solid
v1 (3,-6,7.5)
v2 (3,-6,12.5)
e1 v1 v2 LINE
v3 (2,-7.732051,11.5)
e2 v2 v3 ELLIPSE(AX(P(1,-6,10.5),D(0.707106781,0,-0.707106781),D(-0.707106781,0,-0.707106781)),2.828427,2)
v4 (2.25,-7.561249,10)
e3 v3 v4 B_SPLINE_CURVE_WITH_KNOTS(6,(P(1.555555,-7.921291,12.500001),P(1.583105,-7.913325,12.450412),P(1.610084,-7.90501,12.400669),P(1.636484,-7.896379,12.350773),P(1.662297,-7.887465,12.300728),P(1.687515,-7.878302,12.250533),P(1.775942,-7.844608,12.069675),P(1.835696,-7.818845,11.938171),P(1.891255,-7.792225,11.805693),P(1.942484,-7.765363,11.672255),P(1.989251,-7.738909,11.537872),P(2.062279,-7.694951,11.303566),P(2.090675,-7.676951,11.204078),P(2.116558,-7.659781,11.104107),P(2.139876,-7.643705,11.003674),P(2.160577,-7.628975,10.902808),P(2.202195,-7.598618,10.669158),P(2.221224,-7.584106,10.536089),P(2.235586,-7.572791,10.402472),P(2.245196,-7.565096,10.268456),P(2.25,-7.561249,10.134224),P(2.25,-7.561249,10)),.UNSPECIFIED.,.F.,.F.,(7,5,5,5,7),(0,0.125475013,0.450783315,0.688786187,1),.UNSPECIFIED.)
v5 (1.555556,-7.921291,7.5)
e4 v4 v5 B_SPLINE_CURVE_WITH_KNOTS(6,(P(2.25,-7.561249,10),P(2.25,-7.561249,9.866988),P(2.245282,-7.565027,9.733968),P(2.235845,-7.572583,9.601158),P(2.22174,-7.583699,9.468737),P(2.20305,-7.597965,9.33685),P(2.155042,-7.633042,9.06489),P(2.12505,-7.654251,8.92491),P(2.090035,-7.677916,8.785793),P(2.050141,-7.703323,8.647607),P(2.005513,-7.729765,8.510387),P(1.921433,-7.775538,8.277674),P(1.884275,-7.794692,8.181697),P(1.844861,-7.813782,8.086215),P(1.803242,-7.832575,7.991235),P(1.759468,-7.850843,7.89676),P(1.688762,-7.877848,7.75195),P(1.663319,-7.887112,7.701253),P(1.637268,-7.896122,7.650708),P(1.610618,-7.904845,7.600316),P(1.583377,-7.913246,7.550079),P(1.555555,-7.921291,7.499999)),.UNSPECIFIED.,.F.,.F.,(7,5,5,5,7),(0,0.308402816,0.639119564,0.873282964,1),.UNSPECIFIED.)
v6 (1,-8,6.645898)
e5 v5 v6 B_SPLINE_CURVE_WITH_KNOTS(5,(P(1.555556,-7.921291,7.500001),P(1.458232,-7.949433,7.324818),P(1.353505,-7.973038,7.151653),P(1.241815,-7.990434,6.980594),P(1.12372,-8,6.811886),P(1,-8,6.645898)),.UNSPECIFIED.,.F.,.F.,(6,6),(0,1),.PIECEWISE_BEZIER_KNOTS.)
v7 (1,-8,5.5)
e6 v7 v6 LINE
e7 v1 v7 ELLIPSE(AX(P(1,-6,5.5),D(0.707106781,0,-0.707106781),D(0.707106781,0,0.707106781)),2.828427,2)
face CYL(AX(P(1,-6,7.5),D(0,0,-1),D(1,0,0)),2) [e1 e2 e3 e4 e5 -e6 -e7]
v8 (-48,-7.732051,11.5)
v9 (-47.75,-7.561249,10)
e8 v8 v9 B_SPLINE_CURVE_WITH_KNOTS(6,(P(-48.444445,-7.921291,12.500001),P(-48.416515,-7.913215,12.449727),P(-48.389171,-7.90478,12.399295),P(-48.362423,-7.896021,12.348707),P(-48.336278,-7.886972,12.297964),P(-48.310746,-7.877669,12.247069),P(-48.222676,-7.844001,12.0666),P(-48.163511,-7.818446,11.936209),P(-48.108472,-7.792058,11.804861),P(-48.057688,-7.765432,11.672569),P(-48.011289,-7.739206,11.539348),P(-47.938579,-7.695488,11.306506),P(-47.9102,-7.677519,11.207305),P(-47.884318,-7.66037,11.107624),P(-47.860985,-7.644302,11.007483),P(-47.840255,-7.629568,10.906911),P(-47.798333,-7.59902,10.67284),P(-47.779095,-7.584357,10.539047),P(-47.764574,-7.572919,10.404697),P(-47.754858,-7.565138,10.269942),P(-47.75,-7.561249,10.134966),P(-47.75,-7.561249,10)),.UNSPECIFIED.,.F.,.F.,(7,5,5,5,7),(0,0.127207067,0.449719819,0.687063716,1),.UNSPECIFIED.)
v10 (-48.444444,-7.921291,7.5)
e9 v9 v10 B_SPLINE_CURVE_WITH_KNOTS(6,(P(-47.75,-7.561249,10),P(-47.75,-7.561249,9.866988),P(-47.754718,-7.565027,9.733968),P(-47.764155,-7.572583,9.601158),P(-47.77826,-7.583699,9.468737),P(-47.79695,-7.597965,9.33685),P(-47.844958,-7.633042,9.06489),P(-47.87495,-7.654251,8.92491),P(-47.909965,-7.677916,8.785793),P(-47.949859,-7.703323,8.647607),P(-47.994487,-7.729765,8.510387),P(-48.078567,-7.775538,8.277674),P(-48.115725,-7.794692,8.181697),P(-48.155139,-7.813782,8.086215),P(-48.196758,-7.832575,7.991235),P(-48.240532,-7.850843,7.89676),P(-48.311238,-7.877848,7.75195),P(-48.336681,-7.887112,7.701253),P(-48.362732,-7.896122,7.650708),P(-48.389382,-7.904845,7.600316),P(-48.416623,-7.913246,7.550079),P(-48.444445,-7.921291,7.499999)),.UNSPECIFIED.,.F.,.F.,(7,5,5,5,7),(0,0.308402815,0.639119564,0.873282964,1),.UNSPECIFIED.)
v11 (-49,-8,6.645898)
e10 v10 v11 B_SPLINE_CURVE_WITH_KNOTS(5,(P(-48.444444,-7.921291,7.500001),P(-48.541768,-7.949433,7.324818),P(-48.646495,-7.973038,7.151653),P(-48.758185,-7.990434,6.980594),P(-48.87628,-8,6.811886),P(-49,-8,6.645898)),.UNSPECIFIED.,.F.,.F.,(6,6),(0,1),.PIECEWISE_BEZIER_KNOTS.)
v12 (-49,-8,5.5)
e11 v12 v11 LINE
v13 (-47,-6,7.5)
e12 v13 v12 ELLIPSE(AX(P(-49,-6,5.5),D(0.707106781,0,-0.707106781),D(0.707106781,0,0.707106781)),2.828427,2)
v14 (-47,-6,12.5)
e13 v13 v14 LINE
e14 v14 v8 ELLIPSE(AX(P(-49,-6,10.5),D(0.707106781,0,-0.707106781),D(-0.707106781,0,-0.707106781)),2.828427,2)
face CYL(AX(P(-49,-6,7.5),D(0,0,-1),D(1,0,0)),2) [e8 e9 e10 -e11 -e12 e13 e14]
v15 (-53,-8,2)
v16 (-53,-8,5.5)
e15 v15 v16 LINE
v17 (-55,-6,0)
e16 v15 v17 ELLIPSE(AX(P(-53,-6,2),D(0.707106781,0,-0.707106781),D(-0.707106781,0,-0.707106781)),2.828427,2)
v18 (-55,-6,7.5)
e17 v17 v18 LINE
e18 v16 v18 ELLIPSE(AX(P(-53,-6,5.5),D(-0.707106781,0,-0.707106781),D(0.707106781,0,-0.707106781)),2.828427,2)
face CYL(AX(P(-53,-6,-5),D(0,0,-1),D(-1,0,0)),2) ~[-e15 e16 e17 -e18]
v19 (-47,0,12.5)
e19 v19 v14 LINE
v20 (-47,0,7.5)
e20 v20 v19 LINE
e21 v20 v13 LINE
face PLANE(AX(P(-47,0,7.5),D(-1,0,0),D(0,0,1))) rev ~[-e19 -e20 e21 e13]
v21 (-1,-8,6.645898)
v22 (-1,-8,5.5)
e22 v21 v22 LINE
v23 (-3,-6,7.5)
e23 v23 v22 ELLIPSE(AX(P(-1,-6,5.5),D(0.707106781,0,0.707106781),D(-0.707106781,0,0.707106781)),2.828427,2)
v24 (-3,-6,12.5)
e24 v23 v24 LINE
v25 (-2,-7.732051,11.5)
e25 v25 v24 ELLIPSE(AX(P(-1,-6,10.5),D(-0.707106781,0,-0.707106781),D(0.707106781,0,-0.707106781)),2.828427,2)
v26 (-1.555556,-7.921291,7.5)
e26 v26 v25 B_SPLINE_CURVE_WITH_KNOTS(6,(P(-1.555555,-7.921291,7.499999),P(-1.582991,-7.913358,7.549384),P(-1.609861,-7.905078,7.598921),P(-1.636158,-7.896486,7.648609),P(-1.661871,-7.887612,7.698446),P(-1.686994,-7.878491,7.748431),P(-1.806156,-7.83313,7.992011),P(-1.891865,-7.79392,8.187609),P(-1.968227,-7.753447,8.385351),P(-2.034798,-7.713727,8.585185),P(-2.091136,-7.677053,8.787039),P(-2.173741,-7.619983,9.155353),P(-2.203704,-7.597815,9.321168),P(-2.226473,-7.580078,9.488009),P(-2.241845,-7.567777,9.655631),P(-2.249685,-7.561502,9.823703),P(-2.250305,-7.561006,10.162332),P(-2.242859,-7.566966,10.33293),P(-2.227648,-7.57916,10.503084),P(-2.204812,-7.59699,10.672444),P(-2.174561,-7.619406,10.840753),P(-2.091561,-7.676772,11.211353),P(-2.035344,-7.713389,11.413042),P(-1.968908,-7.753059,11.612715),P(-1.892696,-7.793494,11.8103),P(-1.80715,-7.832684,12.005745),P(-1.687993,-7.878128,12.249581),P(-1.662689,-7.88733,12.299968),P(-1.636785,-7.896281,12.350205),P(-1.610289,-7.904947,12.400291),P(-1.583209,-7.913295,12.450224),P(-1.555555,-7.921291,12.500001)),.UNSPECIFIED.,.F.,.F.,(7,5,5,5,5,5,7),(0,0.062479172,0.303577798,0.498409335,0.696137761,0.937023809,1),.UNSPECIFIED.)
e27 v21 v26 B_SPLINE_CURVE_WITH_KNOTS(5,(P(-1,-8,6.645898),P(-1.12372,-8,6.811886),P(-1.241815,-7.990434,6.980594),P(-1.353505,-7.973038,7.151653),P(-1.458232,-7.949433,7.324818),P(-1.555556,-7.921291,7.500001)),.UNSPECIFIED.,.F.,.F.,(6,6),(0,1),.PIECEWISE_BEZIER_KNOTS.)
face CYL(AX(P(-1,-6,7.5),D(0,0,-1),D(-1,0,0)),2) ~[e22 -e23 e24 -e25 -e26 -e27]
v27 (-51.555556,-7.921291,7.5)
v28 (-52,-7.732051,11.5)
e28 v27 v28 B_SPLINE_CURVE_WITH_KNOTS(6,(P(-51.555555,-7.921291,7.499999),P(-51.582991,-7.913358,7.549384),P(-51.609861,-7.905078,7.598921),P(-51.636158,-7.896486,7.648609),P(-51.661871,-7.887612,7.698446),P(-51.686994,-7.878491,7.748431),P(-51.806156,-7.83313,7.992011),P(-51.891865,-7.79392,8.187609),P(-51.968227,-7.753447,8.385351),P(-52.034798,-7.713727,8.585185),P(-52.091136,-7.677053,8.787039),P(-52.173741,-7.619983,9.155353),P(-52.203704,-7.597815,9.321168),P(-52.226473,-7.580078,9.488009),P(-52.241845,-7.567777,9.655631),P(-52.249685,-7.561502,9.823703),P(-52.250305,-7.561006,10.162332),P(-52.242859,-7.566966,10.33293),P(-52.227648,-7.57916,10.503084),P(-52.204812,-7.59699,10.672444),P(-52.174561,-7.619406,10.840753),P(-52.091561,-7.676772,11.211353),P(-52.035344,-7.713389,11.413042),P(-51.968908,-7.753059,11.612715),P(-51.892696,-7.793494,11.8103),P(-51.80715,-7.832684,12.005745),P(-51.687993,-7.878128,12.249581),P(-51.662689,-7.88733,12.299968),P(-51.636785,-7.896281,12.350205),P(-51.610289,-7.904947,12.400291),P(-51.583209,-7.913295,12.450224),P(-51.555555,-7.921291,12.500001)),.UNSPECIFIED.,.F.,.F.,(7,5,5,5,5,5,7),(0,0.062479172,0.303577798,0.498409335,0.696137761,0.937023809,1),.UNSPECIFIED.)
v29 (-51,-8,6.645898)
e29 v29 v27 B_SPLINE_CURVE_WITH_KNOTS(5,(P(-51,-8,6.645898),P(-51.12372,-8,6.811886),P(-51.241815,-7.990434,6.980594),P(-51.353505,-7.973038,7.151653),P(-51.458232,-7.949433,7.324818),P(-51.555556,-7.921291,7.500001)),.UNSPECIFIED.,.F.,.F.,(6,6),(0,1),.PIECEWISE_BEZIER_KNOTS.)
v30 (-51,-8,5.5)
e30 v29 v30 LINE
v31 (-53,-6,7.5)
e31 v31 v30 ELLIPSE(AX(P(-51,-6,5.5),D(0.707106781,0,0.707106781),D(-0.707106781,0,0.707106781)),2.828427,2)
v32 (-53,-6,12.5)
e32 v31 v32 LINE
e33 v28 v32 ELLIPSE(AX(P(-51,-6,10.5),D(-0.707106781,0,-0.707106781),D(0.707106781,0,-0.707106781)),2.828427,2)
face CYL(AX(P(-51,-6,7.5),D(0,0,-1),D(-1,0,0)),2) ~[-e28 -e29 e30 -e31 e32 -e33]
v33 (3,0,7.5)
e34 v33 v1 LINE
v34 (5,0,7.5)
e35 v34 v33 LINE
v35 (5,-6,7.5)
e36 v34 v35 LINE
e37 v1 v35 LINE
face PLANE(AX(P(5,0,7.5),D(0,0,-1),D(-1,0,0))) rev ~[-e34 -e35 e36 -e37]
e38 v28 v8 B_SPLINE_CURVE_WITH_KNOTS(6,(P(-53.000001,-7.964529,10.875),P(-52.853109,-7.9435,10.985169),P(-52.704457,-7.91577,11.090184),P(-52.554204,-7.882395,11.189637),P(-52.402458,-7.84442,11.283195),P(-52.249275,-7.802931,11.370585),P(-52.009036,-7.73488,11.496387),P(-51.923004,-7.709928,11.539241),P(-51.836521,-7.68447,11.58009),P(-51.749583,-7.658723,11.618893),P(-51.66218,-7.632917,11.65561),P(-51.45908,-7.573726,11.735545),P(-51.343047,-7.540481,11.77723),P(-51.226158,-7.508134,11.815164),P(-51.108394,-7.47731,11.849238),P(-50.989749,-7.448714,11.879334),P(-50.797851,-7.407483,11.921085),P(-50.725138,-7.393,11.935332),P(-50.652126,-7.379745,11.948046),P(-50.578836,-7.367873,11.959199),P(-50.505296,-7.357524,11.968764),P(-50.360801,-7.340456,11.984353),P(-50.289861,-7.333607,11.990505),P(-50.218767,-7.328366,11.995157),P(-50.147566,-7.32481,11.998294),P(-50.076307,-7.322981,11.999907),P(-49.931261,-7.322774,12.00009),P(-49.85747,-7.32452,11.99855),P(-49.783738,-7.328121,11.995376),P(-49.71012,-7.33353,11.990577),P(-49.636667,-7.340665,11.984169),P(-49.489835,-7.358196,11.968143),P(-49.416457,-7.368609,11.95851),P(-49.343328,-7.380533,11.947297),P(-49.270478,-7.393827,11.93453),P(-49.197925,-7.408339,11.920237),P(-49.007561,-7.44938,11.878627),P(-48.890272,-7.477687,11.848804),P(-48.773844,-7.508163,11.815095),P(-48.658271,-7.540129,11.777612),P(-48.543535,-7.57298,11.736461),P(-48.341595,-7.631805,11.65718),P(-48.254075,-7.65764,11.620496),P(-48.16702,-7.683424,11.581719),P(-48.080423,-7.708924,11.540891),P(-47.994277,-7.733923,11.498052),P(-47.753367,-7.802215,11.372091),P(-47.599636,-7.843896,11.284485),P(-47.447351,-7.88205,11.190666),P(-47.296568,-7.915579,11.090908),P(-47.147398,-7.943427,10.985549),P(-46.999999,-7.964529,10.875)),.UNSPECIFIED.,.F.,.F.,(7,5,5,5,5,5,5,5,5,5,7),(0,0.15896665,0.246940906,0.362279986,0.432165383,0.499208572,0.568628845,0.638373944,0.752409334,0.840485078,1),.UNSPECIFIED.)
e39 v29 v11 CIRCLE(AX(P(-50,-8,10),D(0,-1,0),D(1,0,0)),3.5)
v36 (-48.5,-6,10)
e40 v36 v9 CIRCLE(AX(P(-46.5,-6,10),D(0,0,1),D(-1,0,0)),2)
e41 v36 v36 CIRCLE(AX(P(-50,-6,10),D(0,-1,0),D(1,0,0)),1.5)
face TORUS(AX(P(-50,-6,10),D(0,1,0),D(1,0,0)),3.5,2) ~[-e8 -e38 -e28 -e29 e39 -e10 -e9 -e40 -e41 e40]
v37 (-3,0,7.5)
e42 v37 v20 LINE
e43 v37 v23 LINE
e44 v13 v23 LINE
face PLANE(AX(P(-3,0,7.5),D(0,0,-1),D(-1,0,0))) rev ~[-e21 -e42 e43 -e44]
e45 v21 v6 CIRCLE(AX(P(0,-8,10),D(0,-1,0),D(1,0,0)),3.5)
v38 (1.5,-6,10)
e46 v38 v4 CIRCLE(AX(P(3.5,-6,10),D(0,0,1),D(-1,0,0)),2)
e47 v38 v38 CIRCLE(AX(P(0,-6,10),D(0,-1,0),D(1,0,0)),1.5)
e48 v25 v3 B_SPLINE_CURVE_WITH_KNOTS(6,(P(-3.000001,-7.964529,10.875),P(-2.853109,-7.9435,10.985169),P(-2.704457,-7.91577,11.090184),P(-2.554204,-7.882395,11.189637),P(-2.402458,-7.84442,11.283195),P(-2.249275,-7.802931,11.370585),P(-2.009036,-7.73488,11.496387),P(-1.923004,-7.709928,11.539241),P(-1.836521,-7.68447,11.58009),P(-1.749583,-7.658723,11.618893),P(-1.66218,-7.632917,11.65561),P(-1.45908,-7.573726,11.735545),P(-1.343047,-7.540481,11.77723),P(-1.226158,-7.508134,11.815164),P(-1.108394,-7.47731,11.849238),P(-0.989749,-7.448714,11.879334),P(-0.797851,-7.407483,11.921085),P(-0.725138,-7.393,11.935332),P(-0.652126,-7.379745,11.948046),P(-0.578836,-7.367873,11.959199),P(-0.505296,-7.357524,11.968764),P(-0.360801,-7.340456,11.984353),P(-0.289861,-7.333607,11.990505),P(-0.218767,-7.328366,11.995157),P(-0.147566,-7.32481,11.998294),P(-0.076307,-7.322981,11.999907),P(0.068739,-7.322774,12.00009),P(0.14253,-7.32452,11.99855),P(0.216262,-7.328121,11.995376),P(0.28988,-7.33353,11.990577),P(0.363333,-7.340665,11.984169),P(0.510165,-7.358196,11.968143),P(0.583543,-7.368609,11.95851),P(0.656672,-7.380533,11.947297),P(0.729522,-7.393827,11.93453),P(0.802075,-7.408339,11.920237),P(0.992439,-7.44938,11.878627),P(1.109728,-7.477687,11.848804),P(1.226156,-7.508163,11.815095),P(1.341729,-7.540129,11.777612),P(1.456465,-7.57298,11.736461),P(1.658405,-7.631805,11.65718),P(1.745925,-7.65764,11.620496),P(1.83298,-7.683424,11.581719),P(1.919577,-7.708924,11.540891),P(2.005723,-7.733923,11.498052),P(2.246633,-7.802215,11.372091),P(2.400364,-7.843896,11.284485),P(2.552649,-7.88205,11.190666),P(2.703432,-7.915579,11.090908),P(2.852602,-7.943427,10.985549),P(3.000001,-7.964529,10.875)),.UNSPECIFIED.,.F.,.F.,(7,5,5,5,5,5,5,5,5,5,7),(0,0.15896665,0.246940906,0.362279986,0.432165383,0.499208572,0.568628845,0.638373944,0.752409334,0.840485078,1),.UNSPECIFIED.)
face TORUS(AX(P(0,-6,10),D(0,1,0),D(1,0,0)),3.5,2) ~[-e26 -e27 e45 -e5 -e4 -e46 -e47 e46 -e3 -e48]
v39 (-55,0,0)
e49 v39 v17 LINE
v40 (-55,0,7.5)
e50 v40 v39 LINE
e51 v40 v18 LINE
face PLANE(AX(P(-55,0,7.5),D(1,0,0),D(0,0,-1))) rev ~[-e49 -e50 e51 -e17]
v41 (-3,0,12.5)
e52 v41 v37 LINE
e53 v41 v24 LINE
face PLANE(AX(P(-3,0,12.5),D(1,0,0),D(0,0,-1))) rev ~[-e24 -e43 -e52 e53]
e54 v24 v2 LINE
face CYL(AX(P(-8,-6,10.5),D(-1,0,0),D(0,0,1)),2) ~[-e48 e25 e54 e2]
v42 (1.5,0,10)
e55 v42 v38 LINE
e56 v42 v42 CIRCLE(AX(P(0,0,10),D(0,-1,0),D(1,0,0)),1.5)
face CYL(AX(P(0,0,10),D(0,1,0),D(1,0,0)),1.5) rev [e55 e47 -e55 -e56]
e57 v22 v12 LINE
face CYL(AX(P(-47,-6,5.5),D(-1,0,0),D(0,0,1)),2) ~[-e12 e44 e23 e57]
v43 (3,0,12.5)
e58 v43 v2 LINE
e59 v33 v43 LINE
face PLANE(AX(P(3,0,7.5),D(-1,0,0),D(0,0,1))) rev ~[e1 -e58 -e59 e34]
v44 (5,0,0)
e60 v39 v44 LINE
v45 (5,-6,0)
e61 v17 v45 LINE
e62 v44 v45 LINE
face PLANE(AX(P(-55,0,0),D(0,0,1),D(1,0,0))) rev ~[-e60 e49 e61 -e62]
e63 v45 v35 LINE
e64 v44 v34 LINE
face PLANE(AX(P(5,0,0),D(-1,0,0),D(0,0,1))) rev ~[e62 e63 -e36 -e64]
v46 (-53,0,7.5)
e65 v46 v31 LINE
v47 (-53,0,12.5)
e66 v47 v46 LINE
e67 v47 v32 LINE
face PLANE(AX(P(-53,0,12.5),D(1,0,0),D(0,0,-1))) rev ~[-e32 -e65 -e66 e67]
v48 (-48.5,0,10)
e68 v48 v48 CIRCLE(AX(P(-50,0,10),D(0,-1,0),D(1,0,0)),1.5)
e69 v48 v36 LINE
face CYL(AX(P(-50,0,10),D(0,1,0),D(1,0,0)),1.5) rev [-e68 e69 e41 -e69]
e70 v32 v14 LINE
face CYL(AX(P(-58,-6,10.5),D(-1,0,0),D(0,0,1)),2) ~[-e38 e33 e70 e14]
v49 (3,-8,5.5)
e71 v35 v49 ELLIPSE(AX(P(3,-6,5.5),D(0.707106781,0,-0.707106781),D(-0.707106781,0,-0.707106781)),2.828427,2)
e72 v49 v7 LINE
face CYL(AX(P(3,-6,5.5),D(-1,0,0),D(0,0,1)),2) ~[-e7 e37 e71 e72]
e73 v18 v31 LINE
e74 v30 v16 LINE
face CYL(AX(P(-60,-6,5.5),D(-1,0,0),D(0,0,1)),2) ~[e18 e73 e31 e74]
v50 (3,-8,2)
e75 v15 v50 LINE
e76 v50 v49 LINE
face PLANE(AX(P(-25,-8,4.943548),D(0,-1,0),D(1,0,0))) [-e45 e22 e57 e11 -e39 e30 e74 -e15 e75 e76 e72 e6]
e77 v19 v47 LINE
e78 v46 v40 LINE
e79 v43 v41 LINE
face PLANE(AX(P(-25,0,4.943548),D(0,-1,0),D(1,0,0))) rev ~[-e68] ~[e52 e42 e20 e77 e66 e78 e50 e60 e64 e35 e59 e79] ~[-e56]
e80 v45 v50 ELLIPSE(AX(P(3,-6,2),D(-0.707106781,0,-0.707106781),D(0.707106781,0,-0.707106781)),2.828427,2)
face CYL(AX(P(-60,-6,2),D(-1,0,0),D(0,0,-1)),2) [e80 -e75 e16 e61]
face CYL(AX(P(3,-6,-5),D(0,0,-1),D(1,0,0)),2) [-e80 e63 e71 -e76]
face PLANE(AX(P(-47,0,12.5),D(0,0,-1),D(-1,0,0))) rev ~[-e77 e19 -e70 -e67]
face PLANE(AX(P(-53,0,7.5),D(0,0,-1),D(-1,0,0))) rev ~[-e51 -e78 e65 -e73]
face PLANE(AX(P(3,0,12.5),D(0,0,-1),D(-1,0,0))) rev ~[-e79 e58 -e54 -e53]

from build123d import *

# Parameters (mm, degrees)
F0_R         = 1.5
F1_DEPTH     = 8
F2_T1_DEPTH  = 17.5
F2_T3_DEPTH  = 70
F2_T5_DEPTH  = 7
F2_T7_DEPTH  = 10
F2_T9_DEPTH  = 16
F2_T11_DEPTH = 44
F2_T13_DEPTH = 16
F2_T15_DEPTH = 7
F2_T25_DEPTH = 12
F2_T29_DEPTH = 15
F2_T36_DEPTH = 15
F2_T40_DEPTH = 49
F2_T47_DEPTH = 49
F2_T51_DEPTH = 15
F2_T58_DEPTH = 15
F2_T62_DEPTH = 12


# Not quite as in the source:
# - a fillet or chamfer that OpenCascade refuses, or shapes differently, is made with other operations: its cross-section is extruded or revolved along the edge and cut away or added


with BuildPart() as f1:
    # F0 (on Front) → F1 (new body)
    with BuildSketch(Plane.XZ):
        Polygon((-55, 7.5), (-55, 0), (5, 0), (5, 7.5), (3, 7.5), (3, 12.5), (-3, 12.5), (-3, 7.5), (-47, 7.5), (-47, 12.5), (-53, 12.5), (-53, 7.5), align=None)
        with Locations((-50, 10)):
            Circle(F0_R, mode=Mode.SUBTRACT)
        with Locations((0, 10)):
            Circle(F0_R, mode=Mode.SUBTRACT)
    extrude(amount=F1_DEPTH)

    # F2: fillet of radius 2 on 14 edges, made by hand

    # F2_s2 → F2_t1 (cut)
    with BuildSketch(Plane.XY.offset(-5)):
        with BuildLine():
            ThreePointArc((-55, -6), (-54.4142135624, -7.4142135624), (-53, -8))
            Line((-53, -8), (-55, -8))
            Line((-55, -8), (-55, -6))
        make_face()
        with BuildLine():
            ThreePointArc((5, -6), (4.4142135624, -7.4142135624), (3, -8))
            Line((3, -8), (5, -8))
            Line((5, -8), (5, -6))
        make_face()
    extrude(amount=F2_T1_DEPTH, mode=Mode.SUBTRACT)

    # F2_s4 → F2_t3 (cut)
    with BuildSketch(Plane.YZ.offset(-60)):
        with BuildLine():
            ThreePointArc((-6, 0), (-7.4142135624, 0.5857864376), (-8, 2))
            Line((-8, 2), (-8, 0))
            Line((-8, 0), (-6, 0))
        make_face()
    extrude(amount=F2_T3_DEPTH, mode=Mode.SUBTRACT)

    # F2_s6 → F2_t5 (cut)
    with BuildSketch(Plane.YZ.offset(3)):
        with BuildLine():
            ThreePointArc((-6, 7.5), (-7.4142135624, 6.9142135624), (-8, 5.5))
            Line((-8, 5.5), (-8, 7.5))
            Line((-8, 7.5), (-6, 7.5))
        make_face()
    extrude(amount=F2_T5_DEPTH, mode=Mode.SUBTRACT)

    # F2_s8 → F2_t7 (cut)
    with BuildSketch(Plane.XY.offset(7.5)):
        with BuildLine():
            ThreePointArc((3, -6), (2.4142135624, -7.4142135624), (1, -8))
            Line((1, -8), (3, -8))
            Line((3, -8), (3, -6))
        make_face()
        with BuildLine():
            ThreePointArc((-3, -6), (-2.4142135624, -7.4142135624), (-1, -8))
            Line((-1, -8), (-3, -8))
            Line((-3, -8), (-3, -6))
        make_face()
        with BuildLine():
            ThreePointArc((-47, -6), (-47.5857864376, -7.4142135624), (-49, -8))
            Line((-49, -8), (-47, -8))
            Line((-47, -8), (-47, -6))
        make_face()
        with BuildLine():
            ThreePointArc((-53, -6), (-52.4142135624, -7.4142135624), (-51, -8))
            Line((-51, -8), (-53, -8))
            Line((-53, -8), (-53, -6))
        make_face()
    extrude(amount=F2_T7_DEPTH, mode=Mode.SUBTRACT)

    # F2_s10 → F2_t9 (cut)
    with BuildSketch(Plane.YZ.offset(-8)):
        with BuildLine():
            ThreePointArc((-6, 12.5), (-7.4142135624, 11.9142135624), (-8, 10.5))
            Line((-8, 10.5), (-8, 12.5))
            Line((-8, 12.5), (-6, 12.5))
        make_face()
    extrude(amount=F2_T9_DEPTH, mode=Mode.SUBTRACT)

    # F2_s12 → F2_t11 (cut)
    with BuildSketch(Plane.YZ.offset(-47)):
        with BuildLine():
            ThreePointArc((-6, 7.5), (-7.4142135624, 6.9142135624), (-8, 5.5))
            Line((-8, 5.5), (-8, 7.5))
            Line((-8, 7.5), (-6, 7.5))
        make_face()
    extrude(amount=F2_T11_DEPTH, mode=Mode.SUBTRACT)

    # F2_s14 → F2_t13 (cut)
    with BuildSketch(Plane.YZ.offset(-58)):
        with BuildLine():
            ThreePointArc((-6, 12.5), (-7.4142135624, 11.9142135624), (-8, 10.5))
            Line((-8, 10.5), (-8, 12.5))
            Line((-8, 12.5), (-6, 12.5))
        make_face()
    extrude(amount=F2_T13_DEPTH, mode=Mode.SUBTRACT)

    # F2_s16 → F2_t15 (cut)
    with BuildSketch(Plane.YZ.offset(-60)):
        with BuildLine():
            ThreePointArc((-6, 7.5), (-7.4142135624, 6.9142135624), (-8, 5.5))
            Line((-8, 5.5), (-8, 7.5))
            Line((-8, 7.5), (-6, 7.5))
        make_face()
    extrude(amount=F2_T15_DEPTH, mode=Mode.SUBTRACT)

    # F2_s17 → F2_t18 (revolve, cut)
    with BuildSketch(Plane.XY.offset(10)):
        with BuildLine():
            ThreePointArc((-48.5, -6), (-47.9142135624, -7.4142135624), (-46.5, -8))
            Line((-46.5, -8), (-48.5, -8))
            Line((-48.5, -8), (-48.5, -6))
        make_face()
    revolve(axis=Axis((-50, -8, 10), (0, -1, 0)), mode=Mode.SUBTRACT)

    # F2_s19 → F2_t20 (revolve, cut)
    with BuildSketch(Plane.XY.offset(10)):
        with BuildLine():
            ThreePointArc((1.5, -6), (2.0857864376, -7.4142135624), (3.5, -8))
            Line((3.5, -8), (1.5, -8))
            Line((1.5, -8), (1.5, -6))
        make_face()
    revolve(axis=Axis((0, -8, 10), (0, -1, 0)), mode=Mode.SUBTRACT)


with BuildPart() as f2_tool23:
    # F2_s24 → F2_t25 (new body)
    with BuildSketch(Plane.YZ.offset(10)):
        with BuildLine():
            ThreePointArc((-6, 7.5), (-7.4142135624, 6.9142135624), (-8, 5.5))
            Line((-8, 5.5), (-8, 7.5))
            Line((-8, 7.5), (-6, 7.5))
        make_face()
    extrude(amount=-F2_T25_DEPTH)

    split(bisect_by=Plane.YZ.offset(3), keep=Keep.BOTTOM)


with BuildPart() as f2_tool27:
    # F2_s28 → F2_t29 (new body)
    with BuildSketch(Plane.XY.offset(2.5)):
        with BuildLine():
            ThreePointArc((3, -6), (2.4142135624, -7.4142135624), (1, -8))
            Line((1, -8), (3, -8))
            Line((3, -8), (3, -6))
        make_face()
    extrude(amount=F2_T29_DEPTH)

    split(bisect_by=Plane.XY.offset(7.5), keep=Keep.BOTTOM)


with BuildPart() as f2_tool23_1:
    add(f2_tool23.part)

    # F2_t31: intersect F2_tool27
    add(f2_tool27.part, mode=Mode.INTERSECT)


with BuildPart() as f1_1:
    add(f1.part)

    # F2_t21: cut F2_tool23
    add(f2_tool23_1.part, mode=Mode.SUBTRACT)


with BuildPart() as f2_tool34:
    # F2_s35 → F2_t36 (new body)
    with BuildSketch(Plane.XY.offset(17.5)):
        with BuildLine():
            ThreePointArc((-3, -6), (-2.4142135624, -7.4142135624), (-1, -8))
            Line((-1, -8), (-3, -8))
            Line((-3, -8), (-3, -6))
        make_face()
    extrude(amount=-F2_T36_DEPTH)

    split(bisect_by=Plane.XY.offset(7.5), keep=Keep.BOTTOM)


with BuildPart() as f2_tool38:
    # F2_s39 → F2_t40 (new body)
    with BuildSketch(Plane.YZ.offset(2)):
        with BuildLine():
            ThreePointArc((-6, 7.5), (-7.4142135624, 6.9142135624), (-8, 5.5))
            Line((-8, 5.5), (-8, 7.5))
            Line((-8, 7.5), (-6, 7.5))
        make_face()
    extrude(amount=-F2_T40_DEPTH)

    split(bisect_by=Plane.YZ.offset(-3), keep=Keep.TOP)


with BuildPart() as f2_tool34_1:
    add(f2_tool34.part)

    # F2_t42: intersect F2_tool38
    add(f2_tool38.part, mode=Mode.INTERSECT)


with BuildPart() as f1_2:
    add(f1_1.part)

    # F2_t32: cut F2_tool34
    add(f2_tool34_1.part, mode=Mode.SUBTRACT)


with BuildPart() as f2_tool45:
    # F2_s46 → F2_t47 (new body)
    with BuildSketch(Plane.YZ.offset(-3)):
        with BuildLine():
            ThreePointArc((-6, 7.5), (-7.4142135624, 6.9142135624), (-8, 5.5))
            Line((-8, 5.5), (-8, 7.5))
            Line((-8, 7.5), (-6, 7.5))
        make_face()
    extrude(amount=-F2_T47_DEPTH)

    split(bisect_by=Plane.YZ.offset(-47), keep=Keep.BOTTOM)


with BuildPart() as f2_tool49:
    # F2_s50 → F2_t51 (new body)
    with BuildSketch(Plane.XY.offset(2.5)):
        with BuildLine():
            ThreePointArc((-47, -6), (-47.5857864376, -7.4142135624), (-49, -8))
            Line((-49, -8), (-47, -8))
            Line((-47, -8), (-47, -6))
        make_face()
    extrude(amount=F2_T51_DEPTH)

    split(bisect_by=Plane.XY.offset(7.5), keep=Keep.BOTTOM)


with BuildPart() as f2_tool45_1:
    add(f2_tool45.part)

    # F2_t53: intersect F2_tool49
    add(f2_tool49.part, mode=Mode.INTERSECT)


with BuildPart() as f1_3:
    add(f1_2.part)

    # F2_t43: cut F2_tool45
    add(f2_tool45_1.part, mode=Mode.SUBTRACT)


with BuildPart() as f2_tool56:
    # F2_s57 → F2_t58 (new body)
    with BuildSketch(Plane.XY.offset(17.5)):
        with BuildLine():
            ThreePointArc((-53, -6), (-52.4142135624, -7.4142135624), (-51, -8))
            Line((-51, -8), (-53, -8))
            Line((-53, -8), (-53, -6))
        make_face()
    extrude(amount=-F2_T58_DEPTH)

    split(bisect_by=Plane.XY.offset(7.5), keep=Keep.BOTTOM)


with BuildPart() as f2_tool60:
    # F2_s61 → F2_t62 (new body)
    with BuildSketch(Plane.YZ.offset(-48)):
        with BuildLine():
            ThreePointArc((-6, 7.5), (-7.4142135624, 6.9142135624), (-8, 5.5))
            Line((-8, 5.5), (-8, 7.5))
            Line((-8, 7.5), (-6, 7.5))
        make_face()
    extrude(amount=-F2_T62_DEPTH)

    split(bisect_by=Plane.YZ.offset(-53), keep=Keep.TOP)


with BuildPart() as f2_tool56_1:
    add(f2_tool56.part)

    # F2_t64: intersect F2_tool60
    add(f2_tool60.part, mode=Mode.INTERSECT)


with BuildPart() as f1_4:
    add(f1_3.part)

    # F2_t54: cut F2_tool56
    add(f2_tool56_1.part, mode=Mode.SUBTRACT)


solid = f1_4.part
